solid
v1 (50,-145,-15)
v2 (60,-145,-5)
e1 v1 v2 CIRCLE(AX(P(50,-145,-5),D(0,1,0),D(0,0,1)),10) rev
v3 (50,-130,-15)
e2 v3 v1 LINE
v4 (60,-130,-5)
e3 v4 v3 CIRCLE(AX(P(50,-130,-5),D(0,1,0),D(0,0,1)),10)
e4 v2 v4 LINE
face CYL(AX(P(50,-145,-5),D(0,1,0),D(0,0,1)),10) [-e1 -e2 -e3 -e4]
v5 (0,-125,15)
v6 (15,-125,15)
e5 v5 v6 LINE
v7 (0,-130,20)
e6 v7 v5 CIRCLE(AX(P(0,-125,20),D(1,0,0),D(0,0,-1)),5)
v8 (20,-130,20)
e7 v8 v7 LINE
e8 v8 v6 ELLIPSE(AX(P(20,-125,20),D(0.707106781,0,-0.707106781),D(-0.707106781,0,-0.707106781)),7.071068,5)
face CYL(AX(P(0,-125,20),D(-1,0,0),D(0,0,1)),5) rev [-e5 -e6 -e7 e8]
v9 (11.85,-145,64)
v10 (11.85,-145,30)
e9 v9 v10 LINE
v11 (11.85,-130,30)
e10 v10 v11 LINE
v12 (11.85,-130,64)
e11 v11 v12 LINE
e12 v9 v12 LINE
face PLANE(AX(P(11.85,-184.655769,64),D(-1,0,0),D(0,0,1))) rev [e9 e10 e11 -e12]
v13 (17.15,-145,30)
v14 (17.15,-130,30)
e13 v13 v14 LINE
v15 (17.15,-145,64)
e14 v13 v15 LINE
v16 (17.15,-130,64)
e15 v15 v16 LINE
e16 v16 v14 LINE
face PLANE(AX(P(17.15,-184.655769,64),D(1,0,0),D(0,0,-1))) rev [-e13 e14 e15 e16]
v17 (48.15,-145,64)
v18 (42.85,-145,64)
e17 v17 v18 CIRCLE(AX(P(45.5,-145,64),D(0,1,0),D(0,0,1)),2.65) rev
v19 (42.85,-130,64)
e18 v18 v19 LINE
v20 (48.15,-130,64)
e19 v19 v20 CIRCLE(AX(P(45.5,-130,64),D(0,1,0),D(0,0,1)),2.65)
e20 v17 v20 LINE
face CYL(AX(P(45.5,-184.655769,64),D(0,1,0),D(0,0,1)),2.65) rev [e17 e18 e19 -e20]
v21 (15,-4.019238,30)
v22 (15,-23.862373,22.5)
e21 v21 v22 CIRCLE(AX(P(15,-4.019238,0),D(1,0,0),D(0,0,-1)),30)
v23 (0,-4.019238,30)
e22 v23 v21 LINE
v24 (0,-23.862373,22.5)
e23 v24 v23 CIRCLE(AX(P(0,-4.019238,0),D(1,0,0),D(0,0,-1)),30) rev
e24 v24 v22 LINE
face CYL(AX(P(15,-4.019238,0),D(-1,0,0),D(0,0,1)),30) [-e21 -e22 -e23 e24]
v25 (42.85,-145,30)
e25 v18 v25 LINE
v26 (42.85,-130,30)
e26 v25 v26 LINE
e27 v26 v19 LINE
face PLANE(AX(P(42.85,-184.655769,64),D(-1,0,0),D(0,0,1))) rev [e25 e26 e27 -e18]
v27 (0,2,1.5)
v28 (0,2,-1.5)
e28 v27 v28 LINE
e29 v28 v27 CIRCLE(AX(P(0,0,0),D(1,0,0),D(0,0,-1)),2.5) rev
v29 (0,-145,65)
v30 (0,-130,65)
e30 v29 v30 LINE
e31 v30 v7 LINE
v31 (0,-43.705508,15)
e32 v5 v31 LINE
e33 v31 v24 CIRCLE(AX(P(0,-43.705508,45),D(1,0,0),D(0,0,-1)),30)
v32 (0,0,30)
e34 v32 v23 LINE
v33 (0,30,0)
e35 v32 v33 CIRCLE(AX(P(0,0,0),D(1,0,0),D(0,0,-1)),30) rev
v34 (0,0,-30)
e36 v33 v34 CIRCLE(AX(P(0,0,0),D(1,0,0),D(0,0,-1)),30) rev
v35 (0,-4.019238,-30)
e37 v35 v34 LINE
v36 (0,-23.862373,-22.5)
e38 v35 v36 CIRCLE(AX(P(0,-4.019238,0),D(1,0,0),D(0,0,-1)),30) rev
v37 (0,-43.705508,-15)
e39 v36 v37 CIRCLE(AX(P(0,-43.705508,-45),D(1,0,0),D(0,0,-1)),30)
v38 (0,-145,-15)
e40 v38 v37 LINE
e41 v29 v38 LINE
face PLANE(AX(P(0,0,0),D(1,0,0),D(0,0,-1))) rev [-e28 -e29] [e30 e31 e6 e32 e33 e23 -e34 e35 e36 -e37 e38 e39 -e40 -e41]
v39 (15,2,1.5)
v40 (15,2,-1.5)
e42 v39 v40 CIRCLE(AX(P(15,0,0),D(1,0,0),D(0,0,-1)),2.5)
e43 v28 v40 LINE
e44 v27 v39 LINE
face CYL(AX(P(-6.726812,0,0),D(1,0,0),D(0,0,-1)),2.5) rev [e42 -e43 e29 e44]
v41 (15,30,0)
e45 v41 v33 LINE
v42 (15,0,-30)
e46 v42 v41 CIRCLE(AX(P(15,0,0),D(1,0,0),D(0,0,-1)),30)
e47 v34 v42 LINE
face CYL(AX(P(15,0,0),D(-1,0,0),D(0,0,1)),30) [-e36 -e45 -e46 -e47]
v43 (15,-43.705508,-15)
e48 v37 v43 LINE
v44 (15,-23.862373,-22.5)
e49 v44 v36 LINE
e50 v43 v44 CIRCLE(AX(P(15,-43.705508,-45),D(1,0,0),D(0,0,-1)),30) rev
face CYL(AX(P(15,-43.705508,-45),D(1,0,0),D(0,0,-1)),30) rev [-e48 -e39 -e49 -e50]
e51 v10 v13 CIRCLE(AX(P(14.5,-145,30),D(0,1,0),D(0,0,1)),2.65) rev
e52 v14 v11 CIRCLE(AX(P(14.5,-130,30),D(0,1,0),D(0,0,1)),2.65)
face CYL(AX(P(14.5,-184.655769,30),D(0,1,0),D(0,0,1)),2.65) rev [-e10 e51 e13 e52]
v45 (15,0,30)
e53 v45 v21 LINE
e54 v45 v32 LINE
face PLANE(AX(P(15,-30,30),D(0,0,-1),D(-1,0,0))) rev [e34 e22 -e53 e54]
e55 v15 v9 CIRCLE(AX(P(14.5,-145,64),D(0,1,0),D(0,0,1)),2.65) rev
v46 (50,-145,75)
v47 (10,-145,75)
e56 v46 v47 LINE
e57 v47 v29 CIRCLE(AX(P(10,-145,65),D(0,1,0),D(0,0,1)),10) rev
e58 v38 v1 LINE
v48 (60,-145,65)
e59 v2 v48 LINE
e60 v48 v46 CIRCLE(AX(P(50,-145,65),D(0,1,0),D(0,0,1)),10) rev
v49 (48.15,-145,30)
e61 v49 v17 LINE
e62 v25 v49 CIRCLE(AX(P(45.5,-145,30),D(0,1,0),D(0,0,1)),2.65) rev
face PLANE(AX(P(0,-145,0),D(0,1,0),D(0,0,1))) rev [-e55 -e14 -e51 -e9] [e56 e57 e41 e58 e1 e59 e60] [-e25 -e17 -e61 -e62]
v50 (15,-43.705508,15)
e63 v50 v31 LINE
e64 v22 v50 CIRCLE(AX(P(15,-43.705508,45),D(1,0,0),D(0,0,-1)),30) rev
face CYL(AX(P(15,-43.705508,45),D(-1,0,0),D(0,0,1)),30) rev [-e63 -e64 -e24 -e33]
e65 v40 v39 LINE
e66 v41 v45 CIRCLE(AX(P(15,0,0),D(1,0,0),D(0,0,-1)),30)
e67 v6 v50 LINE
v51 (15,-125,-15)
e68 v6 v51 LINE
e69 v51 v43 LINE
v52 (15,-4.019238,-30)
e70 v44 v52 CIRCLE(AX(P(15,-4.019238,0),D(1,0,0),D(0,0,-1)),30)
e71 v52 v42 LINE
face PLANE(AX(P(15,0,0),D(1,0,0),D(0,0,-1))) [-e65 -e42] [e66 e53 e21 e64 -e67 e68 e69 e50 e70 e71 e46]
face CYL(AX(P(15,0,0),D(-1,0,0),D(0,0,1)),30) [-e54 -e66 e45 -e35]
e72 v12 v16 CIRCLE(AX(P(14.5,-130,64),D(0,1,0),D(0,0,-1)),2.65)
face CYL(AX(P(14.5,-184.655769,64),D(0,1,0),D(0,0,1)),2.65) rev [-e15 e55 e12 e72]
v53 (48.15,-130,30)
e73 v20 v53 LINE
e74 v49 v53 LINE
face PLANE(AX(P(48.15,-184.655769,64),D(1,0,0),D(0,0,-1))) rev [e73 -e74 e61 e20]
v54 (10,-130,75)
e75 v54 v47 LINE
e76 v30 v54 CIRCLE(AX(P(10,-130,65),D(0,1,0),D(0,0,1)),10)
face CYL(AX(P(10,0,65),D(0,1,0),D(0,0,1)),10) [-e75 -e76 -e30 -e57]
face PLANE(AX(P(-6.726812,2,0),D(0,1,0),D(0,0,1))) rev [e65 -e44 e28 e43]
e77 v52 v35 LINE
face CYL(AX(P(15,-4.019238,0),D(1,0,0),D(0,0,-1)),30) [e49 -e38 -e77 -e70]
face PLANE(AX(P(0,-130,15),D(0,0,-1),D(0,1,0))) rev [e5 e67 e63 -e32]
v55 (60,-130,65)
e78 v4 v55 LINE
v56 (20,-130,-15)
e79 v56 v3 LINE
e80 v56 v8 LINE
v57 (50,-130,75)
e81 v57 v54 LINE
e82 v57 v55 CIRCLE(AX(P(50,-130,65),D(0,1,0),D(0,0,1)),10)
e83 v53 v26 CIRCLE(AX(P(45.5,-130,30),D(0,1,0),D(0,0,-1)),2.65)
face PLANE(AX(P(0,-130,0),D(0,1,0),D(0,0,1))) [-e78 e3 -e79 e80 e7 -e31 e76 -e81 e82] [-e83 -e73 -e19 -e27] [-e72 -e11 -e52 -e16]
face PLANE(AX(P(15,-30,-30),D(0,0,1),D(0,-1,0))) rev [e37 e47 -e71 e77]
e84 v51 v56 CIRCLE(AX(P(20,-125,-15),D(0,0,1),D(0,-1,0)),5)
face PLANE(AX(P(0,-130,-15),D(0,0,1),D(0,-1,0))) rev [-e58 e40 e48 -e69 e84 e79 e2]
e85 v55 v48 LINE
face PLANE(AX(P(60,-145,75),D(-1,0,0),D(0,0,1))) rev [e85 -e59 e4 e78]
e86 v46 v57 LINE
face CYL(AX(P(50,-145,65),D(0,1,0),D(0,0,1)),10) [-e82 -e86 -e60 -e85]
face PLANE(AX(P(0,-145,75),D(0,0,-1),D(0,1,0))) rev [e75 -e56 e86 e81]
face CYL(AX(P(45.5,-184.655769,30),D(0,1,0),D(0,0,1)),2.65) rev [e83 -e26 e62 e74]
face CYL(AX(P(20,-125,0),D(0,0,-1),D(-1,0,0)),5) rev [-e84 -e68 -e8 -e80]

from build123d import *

# Parameters (mm, degrees)
SKETCH1_W           = 60
SKETCH1_H           = 60
BOSS_EXTRUDE1_DEPTH = 15
CUT_EXTRUDE1_DEPTH  = 15
SKETCH8_W           = 15
SKETCH8_H           = 30
BOSS_EXTRUDE2_DEPTH = 100
BOSS_EXTRUDE3_DEPTH = 15
CUT_EXTRUDE4_DEPTH  = 15
FILLET1_R           = 30
FILLET3_R           = 5
FILLET4_R           = 10
FILLET5_R           = 30


with BuildPart() as part:
    # Sketch1 → Boss-Extrude1 (new body)
    with BuildSketch(Plane(origin=(0, 0, 0), x_dir=(0, 0, -1), z_dir=(1, 0, 0))):
        Rectangle(SKETCH1_W, SKETCH1_H)
    extrude(amount=BOSS_EXTRUDE1_DEPTH)

    # Sketch2 → Cut-Extrude1 (cut)
    with BuildSketch(Plane(origin=(15, 0, 0), x_dir=(0, 0, -1), z_dir=(1, 0, 0))):
        with BuildLine():
            ThreePointArc((2.5, 0), (2.236067977, 1.118033989), (1.5, 2))
            Line((1.5, 2), (-1.5, 2))
            ThreePointArc((-1.5, 2), (-1.118033989, -2.236067977), (2.5, 0))
        make_face()
    extrude(amount=-CUT_EXTRUDE1_DEPTH, mode=Mode.SUBTRACT)

    # Sketch8 → Boss-Extrude2 (add)
    with BuildSketch(Plane.XZ.offset(30)):
        with Locations((7.5, 0)):
            Rectangle(SKETCH8_W, SKETCH8_H)
    extrude(amount=BOSS_EXTRUDE2_DEPTH)

    # Sketch9 → Boss-Extrude3 (add)
    with BuildSketch(Plane.XZ.offset(130)):
        Polygon((0, 0), (0, 75), (60, 75), (60, -15), (0, -15), align=None)
    extrude(amount=BOSS_EXTRUDE3_DEPTH)

    # Sketch10 → Cut-Extrude4 (cut)
    with BuildSketch(Plane(origin=(0, -130, 0), x_dir=(1, 0, 0), z_dir=(0, 1, 0))):
        with BuildLine():
            Line((48.15, -64), (48.15, -30))
            ThreePointArc((48.15, -30), (45.5, -27.35), (42.85, -30))
            Line((42.85, -30), (42.85, -64))
            ThreePointArc((42.85, -64), (45.5, -66.65), (48.15, -64))
        make_face()
        with BuildLine():
            Line((17.15, -64), (17.15, -30))
            ThreePointArc((17.15, -30), (14.5, -27.35), (11.85, -30))
            Line((11.85, -30), (11.85, -64))
            ThreePointArc((11.85, -64), (14.5, -66.65), (17.15, -64))
        make_face()
    extrude(amount=-CUT_EXTRUDE4_DEPTH, mode=Mode.SUBTRACT)

    # Fillet1
    # the kernel refuses this fillet: 30 mm, written as the material it takes off along each edge
    with BuildSketch(Plane(origin=(-75, 30, 30), x_dir=(0, -1, 0), z_dir=(1, 0, 0))) as fillet1_piece_1:
        with BuildLine():
            CenterArc((FILLET1_R, FILLET1_R), FILLET1_R, 180, 90)
            Line((0, FILLET1_R), (-FILLET1_R * 0.02, FILLET1_R))
            Line((-FILLET1_R * 0.02, FILLET1_R), (-FILLET1_R * 0.02, -FILLET1_R * 0.02))
            Line((-FILLET1_R * 0.02, -FILLET1_R * 0.02), (FILLET1_R, -FILLET1_R * 0.02))
            Line((FILLET1_R, -FILLET1_R * 0.02), (FILLET1_R, 0))
        make_face()
    extrude(amount=165, mode=Mode.SUBTRACT)
    with BuildSketch(Plane(origin=(-64.951905284, -30, 30), x_dir=(0, 0, -1), z_dir=(1, 0, 0))) as fillet1_piece_2:
        with BuildLine():
            CenterArc((30, 25.980762114), FILLET1_R, 180, 60)
            Line((0, 25.980762114), (-0.6, 25.980762114))
            Line((-0.6, 25.980762114), (-0.6, 0))
            Line((-0.6, 0), (0, -0.6))
            ThreePointArc((0, -0.6), (7.5, -0.6), (14.7, -0.519615242))
            Line((14.7, -0.519615242), (15, 0))
        make_face()
    extrude(amount=144.903810568, mode=Mode.SUBTRACT)
    with BuildSketch(Plane(origin=(-64.951905284, -30, -30), x_dir=(0, 0, 1), z_dir=(1, 0, 0))) as fillet1_piece_3:
        with BuildLine():
            CenterArc((30, -25.980762114), FILLET1_R, 120, 60)
            Line((0, -25.980762114), (-0.6, -25.980762114))
            Line((-0.6, -25.980762114), (-0.6, 0))
            Line((-0.6, 0), (0, 0.6))
            ThreePointArc((0, 0.6), (7.5, 0.6), (14.7, 0.519615242))
            Line((14.7, 0.519615242), (15, 0))
        make_face()
    extrude(amount=144.903810568, mode=Mode.SUBTRACT)
    with BuildSketch(Plane(origin=(-75, 30, -30), x_dir=(0, -1, 0), z_dir=(1, 0, 0))) as fillet1_piece_4:
        with BuildLine():
            CenterArc((FILLET1_R, -FILLET1_R), FILLET1_R, 90, 90)
            Line((0, -FILLET1_R), (-FILLET1_R * 0.02, -FILLET1_R))
            Line((-FILLET1_R * 0.02, -FILLET1_R), (-FILLET1_R * 0.02, FILLET1_R * 0.02))
            Line((-FILLET1_R * 0.02, FILLET1_R * 0.02), (FILLET1_R, FILLET1_R * 0.02))
            Line((FILLET1_R, FILLET1_R * 0.02), (FILLET1_R, 0))
        make_face()
    extrude(amount=165, mode=Mode.SUBTRACT)

    # Fillet3
    fillet3_edges = [part.edges().sort_by_distance(p)[0] for p in [
        (15, -130, 0),
        (7.5, -130, 15),
    ]]
    fillet(fillet3_edges, radius=FILLET3_R)

    # Fillet4
    fillet4_edges = [part.edges().sort_by_distance(p)[0] for p in [
        (60, -137.5, -15),
        (60, -137.5, 75),
        (0, -137.5, 75),
    ]]
    fillet(fillet4_edges, radius=FILLET4_R)

    # Fillet5
    fillet5_edges = [part.edges().sort_by_distance(p)[0] for p in [
        (7.5, -30, -15),
        (7.5, -30, 15),
    ]]
    fillet(fillet5_edges, radius=FILLET5_R)


solid = part.part
